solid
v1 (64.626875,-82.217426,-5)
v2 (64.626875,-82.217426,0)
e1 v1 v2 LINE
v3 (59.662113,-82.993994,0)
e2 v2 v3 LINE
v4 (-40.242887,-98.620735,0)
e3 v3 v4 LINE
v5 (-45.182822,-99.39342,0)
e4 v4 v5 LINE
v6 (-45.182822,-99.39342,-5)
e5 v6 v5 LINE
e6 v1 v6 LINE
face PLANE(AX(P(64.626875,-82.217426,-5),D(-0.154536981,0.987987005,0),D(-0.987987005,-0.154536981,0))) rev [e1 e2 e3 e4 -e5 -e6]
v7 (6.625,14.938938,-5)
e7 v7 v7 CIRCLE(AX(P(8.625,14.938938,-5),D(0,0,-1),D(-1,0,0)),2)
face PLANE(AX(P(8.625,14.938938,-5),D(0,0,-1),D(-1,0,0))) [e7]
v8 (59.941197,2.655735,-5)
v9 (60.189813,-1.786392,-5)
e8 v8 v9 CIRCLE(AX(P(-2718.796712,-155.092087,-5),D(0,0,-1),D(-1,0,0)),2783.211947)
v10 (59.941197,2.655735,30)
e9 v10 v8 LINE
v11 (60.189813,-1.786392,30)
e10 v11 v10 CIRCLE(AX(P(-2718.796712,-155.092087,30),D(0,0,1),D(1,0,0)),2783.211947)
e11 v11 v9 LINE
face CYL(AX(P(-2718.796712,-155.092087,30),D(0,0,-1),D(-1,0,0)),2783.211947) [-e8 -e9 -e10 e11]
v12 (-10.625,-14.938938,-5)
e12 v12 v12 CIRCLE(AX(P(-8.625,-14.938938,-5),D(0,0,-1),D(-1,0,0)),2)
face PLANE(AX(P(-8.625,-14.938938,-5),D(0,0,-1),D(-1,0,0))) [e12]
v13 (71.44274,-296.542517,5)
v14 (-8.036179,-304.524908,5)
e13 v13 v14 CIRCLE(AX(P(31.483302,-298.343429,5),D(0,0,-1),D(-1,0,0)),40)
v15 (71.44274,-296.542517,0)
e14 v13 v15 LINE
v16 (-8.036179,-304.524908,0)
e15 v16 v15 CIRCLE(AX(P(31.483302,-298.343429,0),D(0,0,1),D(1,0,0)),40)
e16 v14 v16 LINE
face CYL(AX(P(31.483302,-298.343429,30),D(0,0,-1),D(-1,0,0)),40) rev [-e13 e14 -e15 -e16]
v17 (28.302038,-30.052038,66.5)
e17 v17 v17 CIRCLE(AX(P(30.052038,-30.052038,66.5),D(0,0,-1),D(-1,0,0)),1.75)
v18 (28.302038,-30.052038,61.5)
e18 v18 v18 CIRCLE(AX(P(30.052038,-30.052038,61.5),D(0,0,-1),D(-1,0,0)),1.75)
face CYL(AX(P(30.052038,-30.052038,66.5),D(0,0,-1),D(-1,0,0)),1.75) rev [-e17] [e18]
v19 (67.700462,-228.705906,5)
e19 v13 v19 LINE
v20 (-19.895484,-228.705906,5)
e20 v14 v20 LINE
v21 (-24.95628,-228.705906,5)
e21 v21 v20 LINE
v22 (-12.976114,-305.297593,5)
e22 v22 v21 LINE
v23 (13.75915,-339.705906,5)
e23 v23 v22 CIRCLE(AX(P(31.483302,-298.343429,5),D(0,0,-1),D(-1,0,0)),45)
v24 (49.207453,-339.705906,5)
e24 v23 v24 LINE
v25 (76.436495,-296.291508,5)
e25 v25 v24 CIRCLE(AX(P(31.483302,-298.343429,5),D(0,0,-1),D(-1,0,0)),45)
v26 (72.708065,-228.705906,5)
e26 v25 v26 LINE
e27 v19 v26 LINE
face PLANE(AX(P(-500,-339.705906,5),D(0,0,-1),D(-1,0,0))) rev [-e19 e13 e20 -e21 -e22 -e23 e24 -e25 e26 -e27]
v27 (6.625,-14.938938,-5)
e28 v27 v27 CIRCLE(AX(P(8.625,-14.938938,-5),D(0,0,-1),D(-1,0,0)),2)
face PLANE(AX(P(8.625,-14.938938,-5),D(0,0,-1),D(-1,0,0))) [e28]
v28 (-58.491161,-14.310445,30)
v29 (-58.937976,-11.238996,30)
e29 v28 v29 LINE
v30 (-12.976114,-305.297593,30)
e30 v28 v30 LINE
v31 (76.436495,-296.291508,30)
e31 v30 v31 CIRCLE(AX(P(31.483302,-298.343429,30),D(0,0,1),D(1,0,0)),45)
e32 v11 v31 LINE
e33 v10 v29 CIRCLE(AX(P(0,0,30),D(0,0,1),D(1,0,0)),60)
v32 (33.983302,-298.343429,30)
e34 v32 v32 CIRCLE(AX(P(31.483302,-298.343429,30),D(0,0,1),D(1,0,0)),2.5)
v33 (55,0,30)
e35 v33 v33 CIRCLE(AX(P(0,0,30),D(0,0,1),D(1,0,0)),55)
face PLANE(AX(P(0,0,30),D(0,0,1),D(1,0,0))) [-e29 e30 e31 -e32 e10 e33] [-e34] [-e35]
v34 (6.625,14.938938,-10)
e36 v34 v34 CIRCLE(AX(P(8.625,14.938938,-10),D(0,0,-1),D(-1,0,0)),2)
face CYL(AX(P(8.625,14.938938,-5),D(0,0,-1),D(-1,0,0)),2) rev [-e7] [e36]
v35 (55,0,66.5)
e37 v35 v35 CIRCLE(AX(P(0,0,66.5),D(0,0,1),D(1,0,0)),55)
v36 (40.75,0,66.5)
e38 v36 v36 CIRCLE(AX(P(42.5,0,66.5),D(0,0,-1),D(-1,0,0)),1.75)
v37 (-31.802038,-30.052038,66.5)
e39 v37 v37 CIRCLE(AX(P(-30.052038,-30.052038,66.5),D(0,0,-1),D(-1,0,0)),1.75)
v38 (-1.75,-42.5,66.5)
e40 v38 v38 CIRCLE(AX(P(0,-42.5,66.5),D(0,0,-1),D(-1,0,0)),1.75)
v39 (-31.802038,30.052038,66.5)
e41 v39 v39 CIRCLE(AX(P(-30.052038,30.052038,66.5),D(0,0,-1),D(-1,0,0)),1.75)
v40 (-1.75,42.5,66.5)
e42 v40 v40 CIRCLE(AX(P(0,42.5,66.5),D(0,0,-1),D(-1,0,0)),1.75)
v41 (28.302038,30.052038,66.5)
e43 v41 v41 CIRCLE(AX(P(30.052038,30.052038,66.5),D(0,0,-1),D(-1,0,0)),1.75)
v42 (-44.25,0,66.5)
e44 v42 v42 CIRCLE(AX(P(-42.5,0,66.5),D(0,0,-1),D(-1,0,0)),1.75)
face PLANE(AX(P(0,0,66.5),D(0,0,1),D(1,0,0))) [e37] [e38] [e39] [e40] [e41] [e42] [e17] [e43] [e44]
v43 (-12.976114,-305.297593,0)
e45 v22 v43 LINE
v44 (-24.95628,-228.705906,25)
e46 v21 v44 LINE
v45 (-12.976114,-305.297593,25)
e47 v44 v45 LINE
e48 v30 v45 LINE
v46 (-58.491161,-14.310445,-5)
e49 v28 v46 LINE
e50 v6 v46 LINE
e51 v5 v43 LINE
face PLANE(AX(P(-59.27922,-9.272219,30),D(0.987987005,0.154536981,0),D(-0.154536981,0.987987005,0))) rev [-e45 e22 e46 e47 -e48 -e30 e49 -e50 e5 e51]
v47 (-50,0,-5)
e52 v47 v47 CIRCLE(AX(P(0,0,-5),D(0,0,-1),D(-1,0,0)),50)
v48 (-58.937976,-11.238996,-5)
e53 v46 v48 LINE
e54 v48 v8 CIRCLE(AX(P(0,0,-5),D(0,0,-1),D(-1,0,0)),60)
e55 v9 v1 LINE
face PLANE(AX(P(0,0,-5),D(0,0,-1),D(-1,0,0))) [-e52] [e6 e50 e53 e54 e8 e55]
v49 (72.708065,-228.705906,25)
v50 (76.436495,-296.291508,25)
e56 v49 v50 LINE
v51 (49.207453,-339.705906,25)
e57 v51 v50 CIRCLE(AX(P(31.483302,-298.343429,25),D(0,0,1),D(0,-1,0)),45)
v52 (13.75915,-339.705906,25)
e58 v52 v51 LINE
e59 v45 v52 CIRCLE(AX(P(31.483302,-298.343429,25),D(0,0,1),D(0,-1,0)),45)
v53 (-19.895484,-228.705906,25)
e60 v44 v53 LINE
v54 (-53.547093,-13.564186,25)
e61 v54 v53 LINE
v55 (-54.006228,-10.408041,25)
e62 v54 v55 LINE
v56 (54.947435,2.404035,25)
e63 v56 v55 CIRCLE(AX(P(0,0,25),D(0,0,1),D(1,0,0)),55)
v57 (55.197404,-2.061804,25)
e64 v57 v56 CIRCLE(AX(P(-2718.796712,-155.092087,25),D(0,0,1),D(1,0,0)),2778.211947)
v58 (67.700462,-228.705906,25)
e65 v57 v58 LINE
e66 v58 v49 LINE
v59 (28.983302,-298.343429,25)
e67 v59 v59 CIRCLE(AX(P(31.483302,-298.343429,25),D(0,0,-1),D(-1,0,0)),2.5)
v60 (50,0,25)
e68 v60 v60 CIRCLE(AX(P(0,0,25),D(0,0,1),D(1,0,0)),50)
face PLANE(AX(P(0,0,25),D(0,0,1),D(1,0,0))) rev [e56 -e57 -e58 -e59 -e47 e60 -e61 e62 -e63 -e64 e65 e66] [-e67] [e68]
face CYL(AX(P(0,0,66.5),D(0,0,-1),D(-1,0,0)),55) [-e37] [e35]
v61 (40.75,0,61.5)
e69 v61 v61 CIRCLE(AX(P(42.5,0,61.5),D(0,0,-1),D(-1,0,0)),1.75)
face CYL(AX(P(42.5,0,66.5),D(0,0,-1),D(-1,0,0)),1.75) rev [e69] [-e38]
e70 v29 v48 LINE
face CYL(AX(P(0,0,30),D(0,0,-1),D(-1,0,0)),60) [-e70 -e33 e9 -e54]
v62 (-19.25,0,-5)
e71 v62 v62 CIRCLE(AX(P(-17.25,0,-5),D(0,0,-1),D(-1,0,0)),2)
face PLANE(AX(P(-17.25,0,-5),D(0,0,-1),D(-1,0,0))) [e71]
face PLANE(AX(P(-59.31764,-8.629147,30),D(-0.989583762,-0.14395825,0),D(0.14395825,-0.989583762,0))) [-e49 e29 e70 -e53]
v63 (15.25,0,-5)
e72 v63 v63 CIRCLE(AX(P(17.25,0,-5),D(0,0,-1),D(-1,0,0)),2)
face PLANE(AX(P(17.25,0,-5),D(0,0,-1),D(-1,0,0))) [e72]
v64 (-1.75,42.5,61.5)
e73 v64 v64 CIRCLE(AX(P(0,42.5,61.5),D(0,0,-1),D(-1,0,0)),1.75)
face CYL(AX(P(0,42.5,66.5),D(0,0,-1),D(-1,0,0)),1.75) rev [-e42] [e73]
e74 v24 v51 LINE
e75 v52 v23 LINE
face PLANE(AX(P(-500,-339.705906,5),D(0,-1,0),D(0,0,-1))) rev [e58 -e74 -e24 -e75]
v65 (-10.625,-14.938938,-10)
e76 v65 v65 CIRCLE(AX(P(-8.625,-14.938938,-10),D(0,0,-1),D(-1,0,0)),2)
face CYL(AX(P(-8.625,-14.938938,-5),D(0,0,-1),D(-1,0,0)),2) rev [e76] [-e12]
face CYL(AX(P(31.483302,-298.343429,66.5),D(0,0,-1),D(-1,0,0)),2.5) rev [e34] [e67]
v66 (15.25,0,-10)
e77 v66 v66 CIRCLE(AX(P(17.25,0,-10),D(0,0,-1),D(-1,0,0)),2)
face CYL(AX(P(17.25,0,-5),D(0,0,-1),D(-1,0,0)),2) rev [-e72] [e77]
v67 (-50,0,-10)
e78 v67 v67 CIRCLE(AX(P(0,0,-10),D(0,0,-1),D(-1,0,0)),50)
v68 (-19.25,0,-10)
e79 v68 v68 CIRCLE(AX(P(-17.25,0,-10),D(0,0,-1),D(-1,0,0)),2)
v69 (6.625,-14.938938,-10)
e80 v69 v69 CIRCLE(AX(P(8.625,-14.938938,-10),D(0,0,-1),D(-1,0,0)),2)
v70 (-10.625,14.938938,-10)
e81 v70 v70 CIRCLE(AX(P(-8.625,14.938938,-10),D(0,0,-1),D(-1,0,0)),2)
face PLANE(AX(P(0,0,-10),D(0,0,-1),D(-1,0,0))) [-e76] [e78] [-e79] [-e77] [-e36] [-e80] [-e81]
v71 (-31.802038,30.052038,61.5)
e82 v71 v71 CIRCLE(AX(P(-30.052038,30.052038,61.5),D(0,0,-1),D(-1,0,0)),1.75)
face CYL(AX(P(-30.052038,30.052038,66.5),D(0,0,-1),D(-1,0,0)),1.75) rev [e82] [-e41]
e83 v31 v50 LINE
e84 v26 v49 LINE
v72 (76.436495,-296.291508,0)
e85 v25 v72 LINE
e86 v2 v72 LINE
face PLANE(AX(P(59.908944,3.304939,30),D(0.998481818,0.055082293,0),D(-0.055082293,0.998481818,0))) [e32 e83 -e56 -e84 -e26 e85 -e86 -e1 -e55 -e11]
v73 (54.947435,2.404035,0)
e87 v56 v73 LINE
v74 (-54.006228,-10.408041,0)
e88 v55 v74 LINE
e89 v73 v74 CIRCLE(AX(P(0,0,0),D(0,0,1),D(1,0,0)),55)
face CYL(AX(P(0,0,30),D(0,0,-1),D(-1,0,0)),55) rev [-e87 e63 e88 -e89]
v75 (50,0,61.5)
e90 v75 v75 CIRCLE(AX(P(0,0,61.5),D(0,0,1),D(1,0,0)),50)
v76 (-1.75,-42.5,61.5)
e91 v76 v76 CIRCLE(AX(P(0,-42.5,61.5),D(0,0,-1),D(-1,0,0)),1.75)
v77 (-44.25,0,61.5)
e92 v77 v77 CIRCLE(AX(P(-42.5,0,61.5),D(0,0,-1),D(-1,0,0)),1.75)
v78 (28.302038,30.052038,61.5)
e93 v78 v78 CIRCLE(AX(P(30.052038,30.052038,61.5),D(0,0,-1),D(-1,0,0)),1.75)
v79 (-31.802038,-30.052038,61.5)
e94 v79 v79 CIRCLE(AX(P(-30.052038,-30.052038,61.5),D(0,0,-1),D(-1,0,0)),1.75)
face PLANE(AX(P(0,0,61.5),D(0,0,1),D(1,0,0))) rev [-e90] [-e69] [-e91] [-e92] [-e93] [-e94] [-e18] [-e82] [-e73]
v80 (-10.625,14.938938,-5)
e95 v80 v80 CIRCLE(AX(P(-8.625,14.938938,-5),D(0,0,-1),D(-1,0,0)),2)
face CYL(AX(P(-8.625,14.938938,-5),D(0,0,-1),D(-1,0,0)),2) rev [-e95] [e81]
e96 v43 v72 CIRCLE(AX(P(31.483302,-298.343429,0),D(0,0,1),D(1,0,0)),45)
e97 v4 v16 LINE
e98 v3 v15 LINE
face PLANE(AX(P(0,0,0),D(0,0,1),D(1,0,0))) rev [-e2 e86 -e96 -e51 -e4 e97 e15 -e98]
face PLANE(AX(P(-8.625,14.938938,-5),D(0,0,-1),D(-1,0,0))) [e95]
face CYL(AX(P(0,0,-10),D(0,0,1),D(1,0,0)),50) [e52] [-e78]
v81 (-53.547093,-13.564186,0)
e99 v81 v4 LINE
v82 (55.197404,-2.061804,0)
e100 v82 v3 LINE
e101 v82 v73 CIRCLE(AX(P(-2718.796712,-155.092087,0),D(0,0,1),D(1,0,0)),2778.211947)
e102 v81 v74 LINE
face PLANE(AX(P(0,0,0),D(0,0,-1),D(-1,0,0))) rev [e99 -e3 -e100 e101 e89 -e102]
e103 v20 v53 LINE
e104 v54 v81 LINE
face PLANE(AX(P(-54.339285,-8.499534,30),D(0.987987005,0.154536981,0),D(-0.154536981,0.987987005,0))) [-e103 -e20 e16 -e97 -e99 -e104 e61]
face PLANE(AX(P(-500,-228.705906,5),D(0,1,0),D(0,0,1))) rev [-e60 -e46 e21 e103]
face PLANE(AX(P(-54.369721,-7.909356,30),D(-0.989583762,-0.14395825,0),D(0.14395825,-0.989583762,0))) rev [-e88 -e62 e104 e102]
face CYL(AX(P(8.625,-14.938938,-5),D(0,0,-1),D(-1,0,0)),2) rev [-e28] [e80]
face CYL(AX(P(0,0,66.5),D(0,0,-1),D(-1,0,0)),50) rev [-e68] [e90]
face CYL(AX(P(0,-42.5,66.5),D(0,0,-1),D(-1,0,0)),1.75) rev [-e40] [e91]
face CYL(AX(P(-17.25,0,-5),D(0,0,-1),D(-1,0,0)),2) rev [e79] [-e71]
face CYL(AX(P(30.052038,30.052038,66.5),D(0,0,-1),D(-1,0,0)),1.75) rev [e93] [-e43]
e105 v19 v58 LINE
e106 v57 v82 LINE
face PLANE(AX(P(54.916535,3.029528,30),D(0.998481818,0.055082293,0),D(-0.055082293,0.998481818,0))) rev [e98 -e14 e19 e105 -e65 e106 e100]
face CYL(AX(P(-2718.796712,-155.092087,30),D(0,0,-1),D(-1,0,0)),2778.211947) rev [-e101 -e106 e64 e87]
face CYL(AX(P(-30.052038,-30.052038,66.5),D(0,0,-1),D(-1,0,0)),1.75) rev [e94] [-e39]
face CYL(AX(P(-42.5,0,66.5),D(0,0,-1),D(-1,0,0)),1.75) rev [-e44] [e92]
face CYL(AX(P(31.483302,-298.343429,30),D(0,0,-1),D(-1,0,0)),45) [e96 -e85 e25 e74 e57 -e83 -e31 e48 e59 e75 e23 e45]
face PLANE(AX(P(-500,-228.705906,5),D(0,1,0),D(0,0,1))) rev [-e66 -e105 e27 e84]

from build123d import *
from build123d.topology import SkipClean

# Parameters (mm, degrees)
EXTRUDE_1_DEPTH      = 30
SKETCH_2_R           = 55
EXTRUDE_2_DEPTH      = 36.5
SHELL_4_DEPTH        = 25
SHELL_START          = 25
SHELL_4_2_OUTLINE_R  = 50
SHELL_4_2_DEPTH      = 36.5
SKETCH_3_W           = 20
SKETCH_3_H           = 111
CUT_EXTRUDE_2_DEPTH  = 500
SKETCH_4_R           = 2.5
CUT_EXTRUDE_4_DEPTH  = 355.19861062
SKETCH_5_R           = 1.75
CUT_EXTRUDE_5_DEPTH  = 358.094743401
EXTRUDE_START        = 5
EXTRUDE_3_DEPTH      = 5
SKETCH_12_R          = 50
EXTRUDE_4_DEPTH      = 5
SKETCH_13_R          = 2
CUT_EXTRUDE_10_DEPTH = 5


# Read off the part's stored shape, not the designer's step: 抽壳4
with BuildPart() as part:
    # 草图1 → 凸台-拉伸1 (new body)
    with BuildSketch(Plane.XY):
        with BuildLine():
            Line((-58.937975667, -11.238995696), (-58.491161057, -14.310445119))
            Line((-58.491161057, -14.310445119), (-12.976113652, -305.2975933))
            ThreePointArc((-12.976113652, -305.2975933), (35.99310733, -343.116877228), (76.436495207, -296.291507849))
            Line((76.436495207, -296.291507849), (60.189812793, -1.786392218))
            ThreePointArc((60.189812793, -1.786392218), (60.066392408, 0.434720965), (59.941196791, 2.655734793))
            ThreePointArc((59.941196791, 2.655734793), (-6.965450237, 59.594316029), (-58.937975667, -11.238995696))
        make_face()
    extrude(amount=EXTRUDE_1_DEPTH)

    # 草图2 → 凸台-拉伸2 (add)
    with BuildSketch(Plane.XY.offset(30)):
        Circle(SKETCH_2_R)
    extrude(amount=EXTRUDE_2_DEPTH)

    # 抽壳4 outline → 抽壳4 (cut)
    with BuildSketch(Plane.XY):
        with BuildLine():
            Line((-53.547092666, -13.564185688), (-8.036178628, -304.524908395))
            ThreePointArc((-8.036178628, -304.524908395), (35.480554819, -338.143202606), (71.442739942, -296.542517074))
            Line((71.442739942, -296.542517074), (55.197403703, -2.061803682))
            ThreePointArc((55.197403703, -2.061803682), (55.073318105, 0.171165742), (54.947435043, 2.404034556))
            ThreePointArc((54.947435043, 2.404034556), (-6.423300224, 54.623632379), (-54.006228237, -10.408040718))
            Line((-54.006228237, -10.408040718), (-53.547092666, -13.564185688))
        make_face()
    extrude(amount=SHELL_4_DEPTH, mode=Mode.SUBTRACT)

    # Shell 4 2 outline → Shell 4 2 (cut)
    with BuildSketch(Plane.XY.offset(SHELL_START)):
        Circle(SHELL_4_2_OUTLINE_R)
    extrude(amount=SHELL_4_2_DEPTH, mode=Mode.SUBTRACT)

    # 草图3 → 切除-拉伸2 (cut, symmetric)
    with BuildSketch(Plane(origin=(0, 0, 0), x_dir=(0, 0, -1), z_dir=(1, 0, 0))):
        with Locations((-15, -284.205905552)):
            Rectangle(SKETCH_3_W, SKETCH_3_H)
    extrude(amount=CUT_EXTRUDE_2_DEPTH, both=True, mode=Mode.SUBTRACT)

    # 草图4 → 切除-拉伸4 (cut, through all)
    with BuildSketch(Plane(origin=(0, 0, 25), x_dir=(-1, 0, 0), z_dir=(0, 0, -1))):
        with Locations((-31.483301561, -298.34342916)):
            Circle(SKETCH_4_R)
    extrude(amount=-CUT_EXTRUDE_4_DEPTH, mode=Mode.SUBTRACT)

    # 草图5 → 切除-拉伸5 (cut, through all)
    with BuildSketch(Plane(origin=(0, 0, 61.5), x_dir=(-1, 0, 0), z_dir=(0, 0, -1))):
        with Locations((-42.5, 0)):
            Circle(SKETCH_5_R)
        with Locations((-30.0520382, 30.0520382)):
            Circle(SKETCH_5_R)
        with Locations((0, 42.5)):
            Circle(SKETCH_5_R)
        with Locations((30.0520382, 30.0520382)):
            Circle(SKETCH_5_R)
        with Locations((42.5, 0)):
            Circle(SKETCH_5_R)
        with Locations((30.0520382, -30.0520382)):
            Circle(SKETCH_5_R)
        with Locations((0, -42.5)):
            Circle(SKETCH_5_R)
        with Locations((-30.0520382, -30.0520382)):
            Circle(SKETCH_5_R)
    extrude(amount=-CUT_EXTRUDE_5_DEPTH, mode=Mode.SUBTRACT)

    # 草图11 → 凸台-拉伸3 (add)
    with SkipClean():  # the faces are left unmerged after this step: merging them gives an invalid solid
        with BuildSketch(Plane(origin=(0, 0, 0), x_dir=(-1, 0, 0), z_dir=(0, 0, -1)).offset(EXTRUDE_START)):
            with BuildLine():
                Line((-64.626874789, -82.217425636), (45.182822013, -99.393419788))
                Line((45.182822013, -99.393419788), (58.491161057, -14.310445119))
                Line((58.491161057, -14.310445119), (58.937975667, -11.238995696))
                ThreePointArc((58.937975667, -11.238995696), (6.965450237, 59.594316029), (-59.941196791, 2.655734793))
                ThreePointArc((-59.941196791, 2.655734793), (-60.066392408, 0.434720965), (-60.189812793, -1.786392218))
                Line((-60.189812793, -1.786392218), (-64.626874789, -82.217425636))
            make_face()
        extrude(amount=-EXTRUDE_3_DEPTH)

    # 草图12 → 凸台-拉伸4 (add)
    with SkipClean():  # the faces are left unmerged after this step: merging them gives an invalid solid
        with BuildSketch(Plane(origin=(0, 0, -5), x_dir=(-1, 0, 0), z_dir=(0, 0, -1)).offset(EXTRUDE_START)):
            with Locations(Location((0, 0, 0), (0, 0, 180))):
                Circle(SKETCH_12_R)
        extrude(amount=-EXTRUDE_4_DEPTH)

    # 草图13 → 切除-拉伸10 (cut)
    with SkipClean():  # the faces are left unmerged after this step: merging them gives an invalid solid
        with BuildSketch(Plane(origin=(0, 0, -10), x_dir=(-1, 0, 0), z_dir=(0, 0, -1))):
            with Locations((17.25, 0)):
                Circle(SKETCH_13_R)
            with Locations((8.625, -14.938938215)):
                Circle(SKETCH_13_R)
            with Locations((-8.625, -14.938938215)):
                Circle(SKETCH_13_R)
            with Locations((-17.25, 0)):
                Circle(SKETCH_13_R)
            with Locations((-8.625, 14.938938215)):
                Circle(SKETCH_13_R)
            with Locations((8.625, 14.938938215)):
                Circle(SKETCH_13_R)
        extrude(amount=-CUT_EXTRUDE_10_DEPTH, mode=Mode.SUBTRACT)


solid = part.part
